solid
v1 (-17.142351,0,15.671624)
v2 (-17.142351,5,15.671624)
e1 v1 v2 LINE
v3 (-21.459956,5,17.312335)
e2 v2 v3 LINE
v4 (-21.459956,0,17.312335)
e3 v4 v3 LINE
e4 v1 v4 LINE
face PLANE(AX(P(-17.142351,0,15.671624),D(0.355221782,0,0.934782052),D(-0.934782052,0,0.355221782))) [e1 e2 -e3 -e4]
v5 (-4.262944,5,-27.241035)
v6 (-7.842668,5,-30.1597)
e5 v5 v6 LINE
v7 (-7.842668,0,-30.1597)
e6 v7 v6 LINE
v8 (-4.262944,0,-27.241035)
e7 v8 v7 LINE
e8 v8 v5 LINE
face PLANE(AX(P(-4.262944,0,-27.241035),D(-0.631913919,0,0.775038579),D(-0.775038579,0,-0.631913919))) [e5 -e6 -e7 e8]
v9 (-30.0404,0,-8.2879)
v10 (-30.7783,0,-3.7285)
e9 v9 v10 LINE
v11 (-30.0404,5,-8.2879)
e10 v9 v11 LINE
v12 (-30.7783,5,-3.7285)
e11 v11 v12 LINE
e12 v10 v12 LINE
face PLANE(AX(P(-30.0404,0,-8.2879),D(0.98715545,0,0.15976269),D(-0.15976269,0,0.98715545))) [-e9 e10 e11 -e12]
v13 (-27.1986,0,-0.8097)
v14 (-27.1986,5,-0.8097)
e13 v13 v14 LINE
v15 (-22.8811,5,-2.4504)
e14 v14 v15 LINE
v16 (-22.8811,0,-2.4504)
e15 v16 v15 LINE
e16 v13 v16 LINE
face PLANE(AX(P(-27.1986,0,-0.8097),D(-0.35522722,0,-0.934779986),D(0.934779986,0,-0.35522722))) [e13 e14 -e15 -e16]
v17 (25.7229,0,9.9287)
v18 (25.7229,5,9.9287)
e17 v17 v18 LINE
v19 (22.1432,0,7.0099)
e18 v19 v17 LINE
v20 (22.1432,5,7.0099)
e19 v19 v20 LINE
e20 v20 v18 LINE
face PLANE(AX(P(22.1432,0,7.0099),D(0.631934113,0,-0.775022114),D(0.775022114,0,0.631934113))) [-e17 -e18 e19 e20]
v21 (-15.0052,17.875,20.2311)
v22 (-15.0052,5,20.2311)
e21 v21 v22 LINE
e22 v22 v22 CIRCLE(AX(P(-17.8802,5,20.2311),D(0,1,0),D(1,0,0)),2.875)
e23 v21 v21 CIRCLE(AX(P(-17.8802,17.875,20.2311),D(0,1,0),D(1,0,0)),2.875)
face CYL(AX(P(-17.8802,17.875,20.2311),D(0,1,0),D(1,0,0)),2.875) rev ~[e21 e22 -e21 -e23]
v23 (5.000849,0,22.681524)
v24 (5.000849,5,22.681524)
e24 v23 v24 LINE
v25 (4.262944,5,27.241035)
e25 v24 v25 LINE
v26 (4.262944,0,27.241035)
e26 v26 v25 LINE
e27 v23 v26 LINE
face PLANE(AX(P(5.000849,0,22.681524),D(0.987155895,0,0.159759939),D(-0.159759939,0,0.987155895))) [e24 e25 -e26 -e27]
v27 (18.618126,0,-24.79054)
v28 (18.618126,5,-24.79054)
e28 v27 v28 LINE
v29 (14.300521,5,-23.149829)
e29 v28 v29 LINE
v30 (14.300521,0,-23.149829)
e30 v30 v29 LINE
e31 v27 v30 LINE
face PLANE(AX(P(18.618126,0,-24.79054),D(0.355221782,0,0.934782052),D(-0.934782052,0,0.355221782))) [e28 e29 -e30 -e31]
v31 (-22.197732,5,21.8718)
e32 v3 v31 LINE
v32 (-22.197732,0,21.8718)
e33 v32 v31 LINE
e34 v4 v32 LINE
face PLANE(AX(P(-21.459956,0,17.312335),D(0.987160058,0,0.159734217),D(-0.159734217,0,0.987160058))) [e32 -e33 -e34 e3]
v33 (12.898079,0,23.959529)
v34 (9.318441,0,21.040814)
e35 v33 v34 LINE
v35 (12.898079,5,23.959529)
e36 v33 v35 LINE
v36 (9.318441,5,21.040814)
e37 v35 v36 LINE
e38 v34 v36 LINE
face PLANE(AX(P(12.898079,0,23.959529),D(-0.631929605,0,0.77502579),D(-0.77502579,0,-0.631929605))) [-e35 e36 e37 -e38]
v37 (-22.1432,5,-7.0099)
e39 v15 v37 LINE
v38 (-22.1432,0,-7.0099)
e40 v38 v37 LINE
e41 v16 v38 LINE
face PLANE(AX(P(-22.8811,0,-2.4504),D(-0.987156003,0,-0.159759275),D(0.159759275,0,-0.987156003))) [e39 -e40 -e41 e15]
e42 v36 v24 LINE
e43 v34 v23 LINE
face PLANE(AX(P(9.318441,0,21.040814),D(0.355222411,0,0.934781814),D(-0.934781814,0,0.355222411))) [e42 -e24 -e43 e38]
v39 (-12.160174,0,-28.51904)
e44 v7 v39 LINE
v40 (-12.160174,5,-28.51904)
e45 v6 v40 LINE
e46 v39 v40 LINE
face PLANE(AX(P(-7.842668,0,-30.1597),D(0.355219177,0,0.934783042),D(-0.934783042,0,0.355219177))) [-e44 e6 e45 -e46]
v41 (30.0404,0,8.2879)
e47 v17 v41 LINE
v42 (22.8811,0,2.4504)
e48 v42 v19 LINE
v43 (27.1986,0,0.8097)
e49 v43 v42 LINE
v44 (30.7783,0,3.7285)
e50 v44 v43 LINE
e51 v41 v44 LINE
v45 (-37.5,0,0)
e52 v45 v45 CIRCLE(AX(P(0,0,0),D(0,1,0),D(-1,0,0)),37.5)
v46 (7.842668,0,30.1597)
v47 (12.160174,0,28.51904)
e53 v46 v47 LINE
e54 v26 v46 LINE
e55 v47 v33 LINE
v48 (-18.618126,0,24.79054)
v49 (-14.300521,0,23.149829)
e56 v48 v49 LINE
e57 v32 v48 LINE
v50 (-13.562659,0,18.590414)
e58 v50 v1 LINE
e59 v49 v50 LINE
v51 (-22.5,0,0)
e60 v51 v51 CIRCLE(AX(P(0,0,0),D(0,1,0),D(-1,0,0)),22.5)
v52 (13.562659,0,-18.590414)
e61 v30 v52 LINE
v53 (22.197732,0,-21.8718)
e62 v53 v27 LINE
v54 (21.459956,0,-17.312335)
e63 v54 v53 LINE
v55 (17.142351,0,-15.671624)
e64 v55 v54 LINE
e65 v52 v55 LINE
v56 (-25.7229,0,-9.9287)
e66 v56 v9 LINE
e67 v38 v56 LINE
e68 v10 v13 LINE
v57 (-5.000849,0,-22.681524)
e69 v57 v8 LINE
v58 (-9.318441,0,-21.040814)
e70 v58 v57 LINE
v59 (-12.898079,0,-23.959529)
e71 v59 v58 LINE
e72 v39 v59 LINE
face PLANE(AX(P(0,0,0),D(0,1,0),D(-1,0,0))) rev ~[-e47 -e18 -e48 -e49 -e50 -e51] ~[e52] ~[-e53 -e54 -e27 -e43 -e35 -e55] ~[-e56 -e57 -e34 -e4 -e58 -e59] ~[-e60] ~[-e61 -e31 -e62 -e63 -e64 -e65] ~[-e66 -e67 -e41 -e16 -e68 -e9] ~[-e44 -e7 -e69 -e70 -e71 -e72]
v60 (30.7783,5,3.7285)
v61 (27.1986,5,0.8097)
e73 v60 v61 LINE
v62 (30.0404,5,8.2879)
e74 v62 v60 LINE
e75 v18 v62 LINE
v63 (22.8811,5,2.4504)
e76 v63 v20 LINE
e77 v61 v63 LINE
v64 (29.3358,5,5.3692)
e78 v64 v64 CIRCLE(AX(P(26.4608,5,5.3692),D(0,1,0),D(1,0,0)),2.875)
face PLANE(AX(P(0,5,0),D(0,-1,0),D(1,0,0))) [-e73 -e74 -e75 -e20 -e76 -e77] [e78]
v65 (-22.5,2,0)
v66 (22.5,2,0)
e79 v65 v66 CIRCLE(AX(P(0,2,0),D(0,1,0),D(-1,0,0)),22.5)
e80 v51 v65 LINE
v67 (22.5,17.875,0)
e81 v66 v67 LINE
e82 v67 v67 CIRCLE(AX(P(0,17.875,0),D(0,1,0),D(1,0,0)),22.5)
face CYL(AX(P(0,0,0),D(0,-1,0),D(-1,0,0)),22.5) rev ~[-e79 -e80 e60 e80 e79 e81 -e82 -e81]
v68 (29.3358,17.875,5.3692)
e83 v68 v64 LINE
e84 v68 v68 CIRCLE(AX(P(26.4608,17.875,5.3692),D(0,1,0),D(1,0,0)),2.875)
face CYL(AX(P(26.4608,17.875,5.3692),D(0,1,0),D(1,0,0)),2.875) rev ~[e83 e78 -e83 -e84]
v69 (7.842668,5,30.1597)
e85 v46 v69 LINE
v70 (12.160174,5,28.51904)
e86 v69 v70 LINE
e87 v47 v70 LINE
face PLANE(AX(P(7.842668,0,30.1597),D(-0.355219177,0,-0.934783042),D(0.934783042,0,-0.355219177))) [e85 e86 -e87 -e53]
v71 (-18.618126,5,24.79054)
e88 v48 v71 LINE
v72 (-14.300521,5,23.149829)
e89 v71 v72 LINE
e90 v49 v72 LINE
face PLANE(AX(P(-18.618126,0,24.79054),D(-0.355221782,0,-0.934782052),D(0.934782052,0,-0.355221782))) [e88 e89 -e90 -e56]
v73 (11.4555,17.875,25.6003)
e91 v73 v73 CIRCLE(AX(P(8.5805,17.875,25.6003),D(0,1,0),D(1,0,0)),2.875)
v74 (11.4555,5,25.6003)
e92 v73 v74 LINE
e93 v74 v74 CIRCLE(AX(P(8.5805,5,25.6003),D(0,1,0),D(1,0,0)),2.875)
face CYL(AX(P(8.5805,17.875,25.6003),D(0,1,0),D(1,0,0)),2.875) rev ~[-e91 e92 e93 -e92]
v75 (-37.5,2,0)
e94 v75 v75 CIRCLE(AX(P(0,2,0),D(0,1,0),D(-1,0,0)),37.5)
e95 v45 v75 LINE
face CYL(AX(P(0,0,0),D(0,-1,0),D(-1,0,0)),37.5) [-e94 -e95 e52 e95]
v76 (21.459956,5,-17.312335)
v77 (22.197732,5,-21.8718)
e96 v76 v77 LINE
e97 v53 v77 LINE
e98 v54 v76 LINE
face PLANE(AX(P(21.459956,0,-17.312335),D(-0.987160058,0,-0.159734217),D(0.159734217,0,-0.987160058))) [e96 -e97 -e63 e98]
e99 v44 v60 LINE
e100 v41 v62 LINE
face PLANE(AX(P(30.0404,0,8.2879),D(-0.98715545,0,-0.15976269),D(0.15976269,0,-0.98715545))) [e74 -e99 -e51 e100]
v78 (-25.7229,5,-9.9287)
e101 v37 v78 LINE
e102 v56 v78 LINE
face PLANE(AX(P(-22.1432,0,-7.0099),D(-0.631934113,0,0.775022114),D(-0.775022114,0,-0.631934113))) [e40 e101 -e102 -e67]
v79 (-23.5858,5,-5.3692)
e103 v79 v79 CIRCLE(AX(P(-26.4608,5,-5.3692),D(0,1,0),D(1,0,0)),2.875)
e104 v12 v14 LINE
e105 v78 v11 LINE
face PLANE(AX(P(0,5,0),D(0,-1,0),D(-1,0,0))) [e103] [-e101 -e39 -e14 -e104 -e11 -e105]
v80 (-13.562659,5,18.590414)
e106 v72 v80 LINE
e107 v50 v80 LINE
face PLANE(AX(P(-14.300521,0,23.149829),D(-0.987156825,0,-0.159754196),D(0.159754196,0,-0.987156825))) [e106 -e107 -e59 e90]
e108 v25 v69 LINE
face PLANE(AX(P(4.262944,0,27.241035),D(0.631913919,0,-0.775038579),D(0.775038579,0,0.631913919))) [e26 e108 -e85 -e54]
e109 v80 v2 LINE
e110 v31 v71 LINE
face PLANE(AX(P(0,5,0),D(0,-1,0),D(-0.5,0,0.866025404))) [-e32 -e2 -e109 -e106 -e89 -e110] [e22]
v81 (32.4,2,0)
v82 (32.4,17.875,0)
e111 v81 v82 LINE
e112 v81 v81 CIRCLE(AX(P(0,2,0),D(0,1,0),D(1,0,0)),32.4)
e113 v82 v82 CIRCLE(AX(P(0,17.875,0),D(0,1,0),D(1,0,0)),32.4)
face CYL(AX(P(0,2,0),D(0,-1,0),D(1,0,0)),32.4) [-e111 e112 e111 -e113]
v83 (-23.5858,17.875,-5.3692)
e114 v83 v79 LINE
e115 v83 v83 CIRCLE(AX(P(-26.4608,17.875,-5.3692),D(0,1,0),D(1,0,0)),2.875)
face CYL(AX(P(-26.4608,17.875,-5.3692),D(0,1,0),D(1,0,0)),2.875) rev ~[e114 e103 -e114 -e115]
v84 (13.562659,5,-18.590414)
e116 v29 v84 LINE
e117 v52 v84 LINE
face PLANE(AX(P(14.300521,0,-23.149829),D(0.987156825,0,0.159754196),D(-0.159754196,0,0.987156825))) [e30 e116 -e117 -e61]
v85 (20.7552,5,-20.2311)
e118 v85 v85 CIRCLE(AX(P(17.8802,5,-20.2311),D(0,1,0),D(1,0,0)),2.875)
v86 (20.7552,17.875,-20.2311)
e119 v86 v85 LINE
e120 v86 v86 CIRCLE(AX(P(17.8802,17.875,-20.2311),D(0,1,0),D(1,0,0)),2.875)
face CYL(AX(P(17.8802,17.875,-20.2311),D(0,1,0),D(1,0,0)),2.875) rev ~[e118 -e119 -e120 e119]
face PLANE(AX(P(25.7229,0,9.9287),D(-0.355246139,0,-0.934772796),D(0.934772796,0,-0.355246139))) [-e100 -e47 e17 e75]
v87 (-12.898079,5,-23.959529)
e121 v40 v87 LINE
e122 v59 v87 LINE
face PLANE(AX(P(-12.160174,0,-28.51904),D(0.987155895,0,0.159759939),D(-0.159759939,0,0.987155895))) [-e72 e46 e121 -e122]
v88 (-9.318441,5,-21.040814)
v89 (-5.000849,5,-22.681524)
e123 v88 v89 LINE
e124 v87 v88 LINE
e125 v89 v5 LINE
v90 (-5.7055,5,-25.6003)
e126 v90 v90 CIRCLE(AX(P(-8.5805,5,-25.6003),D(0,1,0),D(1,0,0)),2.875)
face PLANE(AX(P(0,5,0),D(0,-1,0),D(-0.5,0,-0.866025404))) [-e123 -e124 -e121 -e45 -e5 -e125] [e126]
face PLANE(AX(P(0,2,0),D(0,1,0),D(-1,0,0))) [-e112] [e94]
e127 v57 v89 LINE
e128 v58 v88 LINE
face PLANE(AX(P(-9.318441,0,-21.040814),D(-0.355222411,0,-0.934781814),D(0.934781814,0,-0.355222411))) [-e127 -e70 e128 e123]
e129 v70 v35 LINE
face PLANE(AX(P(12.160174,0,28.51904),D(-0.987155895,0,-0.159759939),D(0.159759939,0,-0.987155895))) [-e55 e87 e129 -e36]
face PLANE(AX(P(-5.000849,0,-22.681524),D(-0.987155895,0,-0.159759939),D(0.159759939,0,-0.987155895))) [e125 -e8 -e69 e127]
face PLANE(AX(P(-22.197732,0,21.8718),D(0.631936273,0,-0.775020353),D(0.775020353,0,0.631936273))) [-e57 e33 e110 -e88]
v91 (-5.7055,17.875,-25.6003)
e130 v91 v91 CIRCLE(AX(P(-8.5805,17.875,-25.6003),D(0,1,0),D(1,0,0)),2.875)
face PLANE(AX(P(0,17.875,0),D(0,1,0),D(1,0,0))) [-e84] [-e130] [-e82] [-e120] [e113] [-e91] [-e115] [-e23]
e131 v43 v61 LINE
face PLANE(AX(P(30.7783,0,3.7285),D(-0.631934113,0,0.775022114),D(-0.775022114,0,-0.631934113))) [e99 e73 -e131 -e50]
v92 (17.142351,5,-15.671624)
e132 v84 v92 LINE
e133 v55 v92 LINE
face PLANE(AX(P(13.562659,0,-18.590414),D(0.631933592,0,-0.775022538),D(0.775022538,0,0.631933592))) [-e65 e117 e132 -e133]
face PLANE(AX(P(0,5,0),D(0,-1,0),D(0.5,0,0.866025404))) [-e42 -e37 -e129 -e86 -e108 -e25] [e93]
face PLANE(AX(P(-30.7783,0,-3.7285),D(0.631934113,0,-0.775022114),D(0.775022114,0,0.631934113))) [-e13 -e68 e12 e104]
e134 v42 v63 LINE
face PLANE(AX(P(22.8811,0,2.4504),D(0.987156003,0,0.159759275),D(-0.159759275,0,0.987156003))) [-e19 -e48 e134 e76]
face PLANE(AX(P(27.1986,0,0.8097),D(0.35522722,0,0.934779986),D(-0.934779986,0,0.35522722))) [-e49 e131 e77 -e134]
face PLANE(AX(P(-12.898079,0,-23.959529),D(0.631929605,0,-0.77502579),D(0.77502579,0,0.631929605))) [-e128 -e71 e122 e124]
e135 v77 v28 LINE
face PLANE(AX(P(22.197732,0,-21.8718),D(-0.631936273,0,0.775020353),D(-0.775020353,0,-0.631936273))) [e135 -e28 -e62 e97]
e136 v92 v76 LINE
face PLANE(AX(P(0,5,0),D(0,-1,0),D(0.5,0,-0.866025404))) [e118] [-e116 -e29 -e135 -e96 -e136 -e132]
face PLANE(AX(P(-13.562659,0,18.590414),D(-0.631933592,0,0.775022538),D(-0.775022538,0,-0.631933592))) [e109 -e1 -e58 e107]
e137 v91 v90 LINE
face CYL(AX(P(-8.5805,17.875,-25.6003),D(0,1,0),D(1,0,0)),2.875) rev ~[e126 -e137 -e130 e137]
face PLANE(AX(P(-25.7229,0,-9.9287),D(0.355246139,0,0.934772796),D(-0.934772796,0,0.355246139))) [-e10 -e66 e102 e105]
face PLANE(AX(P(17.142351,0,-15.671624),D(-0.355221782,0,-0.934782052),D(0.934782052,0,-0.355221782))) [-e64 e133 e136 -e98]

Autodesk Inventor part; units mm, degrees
ref_plane "YZ Plane" through (0, 0, 0) normal (1, 0, 0) x (0, 1, 0)
ref_plane "XZ Plane" through (0, 0, 0) normal (0, 1, 0) x (-1, 0, 0)
ref_plane "XY Plane" through (0, 0, 0) normal (0, 0, 1) x (1, 0, 0)
sketch "Sketch1" plane through (0, 0, 0) normal (0, 1, 0) x (-1, 0, 0)
  circle A0 centre (0, 0) radius 22.5
  circle A1 centre (0, 0) radius 37.5
  dimension "d0" = 45
  dimension "d1" = 75
extrude "Extrusion1" add sketch "Sketch1" along normal blind 2
sketch "Sketch2" plane through (0, 2, 0) normal (0, 1, 0) x (1, 0, 0)
  circle A0 centre (0, 0) radius 37.5 projected
  circle A1 centre (0, 0) radius 22.5 projected
  circle A2 centre (0, 0) radius 32.4
  dimension "d4" = 64.8
extrude "Extrusion2" add sketch "Sketch2" along normal blind 15.875 contours A2
feature "FaceDraft1" [suppressed]
sketch "Sketch3" plane through (0, 17.875, 0) normal (0, 1, 0) x (1, 0, 0)
  circle A0 centre (26.4608, -5.3692) radius 2.875 projected
  circle A1 centre (17.8802, 20.2311) radius 2.875 projected
  circle A2 centre (-8.5805, 25.6003) radius 2.875 projected
  circle A3 centre (-26.4608, 5.3692) radius 2.875 projected
  circle A4 centre (-17.8802, -20.2311) radius 2.875 projected
  circle A5 centre (8.5805, -25.6003) radius 2.875 projected
  point P0 (0, 0)
extrude "Extrusion3" cut sketch "Sketch3" against normal through all
sketch "Sketch4" plane through (0, 0, 0) normal (0, -1, 0) x (1, 0, 0)
  circle A0 centre (26.4608, 5.3692) radius 2.875 projected
  line L0 (30.7783, 3.7285) -> (27.1986, 0.8097)
  line L1 (27.1986, 0.8097) -> (22.8811, 2.4504)
  line L2 (22.8811, 2.4504) -> (22.1432, 7.0099)
  line L3 (22.1432, 7.0099) -> (25.7229, 9.9287)
  line L4 (25.7229, 9.9287) -> (30.0404, 8.2879)
  line L5 (30.0404, 8.2879) -> (30.7783, 3.7285)
  point P0 (0, 0)
  dimension "d10" = 8
extrude "Extrusion4" cut sketch "Sketch4" against normal blind 5 contours A0 | L0 L1 L2 L3 L4 L5
pattern_circular "Circular Pattern1" count 6 over 360 about axis through (0, 2, 0) along (0, 1, 0) of "Extrusion4"
properties part number "j1FlangeV2"
